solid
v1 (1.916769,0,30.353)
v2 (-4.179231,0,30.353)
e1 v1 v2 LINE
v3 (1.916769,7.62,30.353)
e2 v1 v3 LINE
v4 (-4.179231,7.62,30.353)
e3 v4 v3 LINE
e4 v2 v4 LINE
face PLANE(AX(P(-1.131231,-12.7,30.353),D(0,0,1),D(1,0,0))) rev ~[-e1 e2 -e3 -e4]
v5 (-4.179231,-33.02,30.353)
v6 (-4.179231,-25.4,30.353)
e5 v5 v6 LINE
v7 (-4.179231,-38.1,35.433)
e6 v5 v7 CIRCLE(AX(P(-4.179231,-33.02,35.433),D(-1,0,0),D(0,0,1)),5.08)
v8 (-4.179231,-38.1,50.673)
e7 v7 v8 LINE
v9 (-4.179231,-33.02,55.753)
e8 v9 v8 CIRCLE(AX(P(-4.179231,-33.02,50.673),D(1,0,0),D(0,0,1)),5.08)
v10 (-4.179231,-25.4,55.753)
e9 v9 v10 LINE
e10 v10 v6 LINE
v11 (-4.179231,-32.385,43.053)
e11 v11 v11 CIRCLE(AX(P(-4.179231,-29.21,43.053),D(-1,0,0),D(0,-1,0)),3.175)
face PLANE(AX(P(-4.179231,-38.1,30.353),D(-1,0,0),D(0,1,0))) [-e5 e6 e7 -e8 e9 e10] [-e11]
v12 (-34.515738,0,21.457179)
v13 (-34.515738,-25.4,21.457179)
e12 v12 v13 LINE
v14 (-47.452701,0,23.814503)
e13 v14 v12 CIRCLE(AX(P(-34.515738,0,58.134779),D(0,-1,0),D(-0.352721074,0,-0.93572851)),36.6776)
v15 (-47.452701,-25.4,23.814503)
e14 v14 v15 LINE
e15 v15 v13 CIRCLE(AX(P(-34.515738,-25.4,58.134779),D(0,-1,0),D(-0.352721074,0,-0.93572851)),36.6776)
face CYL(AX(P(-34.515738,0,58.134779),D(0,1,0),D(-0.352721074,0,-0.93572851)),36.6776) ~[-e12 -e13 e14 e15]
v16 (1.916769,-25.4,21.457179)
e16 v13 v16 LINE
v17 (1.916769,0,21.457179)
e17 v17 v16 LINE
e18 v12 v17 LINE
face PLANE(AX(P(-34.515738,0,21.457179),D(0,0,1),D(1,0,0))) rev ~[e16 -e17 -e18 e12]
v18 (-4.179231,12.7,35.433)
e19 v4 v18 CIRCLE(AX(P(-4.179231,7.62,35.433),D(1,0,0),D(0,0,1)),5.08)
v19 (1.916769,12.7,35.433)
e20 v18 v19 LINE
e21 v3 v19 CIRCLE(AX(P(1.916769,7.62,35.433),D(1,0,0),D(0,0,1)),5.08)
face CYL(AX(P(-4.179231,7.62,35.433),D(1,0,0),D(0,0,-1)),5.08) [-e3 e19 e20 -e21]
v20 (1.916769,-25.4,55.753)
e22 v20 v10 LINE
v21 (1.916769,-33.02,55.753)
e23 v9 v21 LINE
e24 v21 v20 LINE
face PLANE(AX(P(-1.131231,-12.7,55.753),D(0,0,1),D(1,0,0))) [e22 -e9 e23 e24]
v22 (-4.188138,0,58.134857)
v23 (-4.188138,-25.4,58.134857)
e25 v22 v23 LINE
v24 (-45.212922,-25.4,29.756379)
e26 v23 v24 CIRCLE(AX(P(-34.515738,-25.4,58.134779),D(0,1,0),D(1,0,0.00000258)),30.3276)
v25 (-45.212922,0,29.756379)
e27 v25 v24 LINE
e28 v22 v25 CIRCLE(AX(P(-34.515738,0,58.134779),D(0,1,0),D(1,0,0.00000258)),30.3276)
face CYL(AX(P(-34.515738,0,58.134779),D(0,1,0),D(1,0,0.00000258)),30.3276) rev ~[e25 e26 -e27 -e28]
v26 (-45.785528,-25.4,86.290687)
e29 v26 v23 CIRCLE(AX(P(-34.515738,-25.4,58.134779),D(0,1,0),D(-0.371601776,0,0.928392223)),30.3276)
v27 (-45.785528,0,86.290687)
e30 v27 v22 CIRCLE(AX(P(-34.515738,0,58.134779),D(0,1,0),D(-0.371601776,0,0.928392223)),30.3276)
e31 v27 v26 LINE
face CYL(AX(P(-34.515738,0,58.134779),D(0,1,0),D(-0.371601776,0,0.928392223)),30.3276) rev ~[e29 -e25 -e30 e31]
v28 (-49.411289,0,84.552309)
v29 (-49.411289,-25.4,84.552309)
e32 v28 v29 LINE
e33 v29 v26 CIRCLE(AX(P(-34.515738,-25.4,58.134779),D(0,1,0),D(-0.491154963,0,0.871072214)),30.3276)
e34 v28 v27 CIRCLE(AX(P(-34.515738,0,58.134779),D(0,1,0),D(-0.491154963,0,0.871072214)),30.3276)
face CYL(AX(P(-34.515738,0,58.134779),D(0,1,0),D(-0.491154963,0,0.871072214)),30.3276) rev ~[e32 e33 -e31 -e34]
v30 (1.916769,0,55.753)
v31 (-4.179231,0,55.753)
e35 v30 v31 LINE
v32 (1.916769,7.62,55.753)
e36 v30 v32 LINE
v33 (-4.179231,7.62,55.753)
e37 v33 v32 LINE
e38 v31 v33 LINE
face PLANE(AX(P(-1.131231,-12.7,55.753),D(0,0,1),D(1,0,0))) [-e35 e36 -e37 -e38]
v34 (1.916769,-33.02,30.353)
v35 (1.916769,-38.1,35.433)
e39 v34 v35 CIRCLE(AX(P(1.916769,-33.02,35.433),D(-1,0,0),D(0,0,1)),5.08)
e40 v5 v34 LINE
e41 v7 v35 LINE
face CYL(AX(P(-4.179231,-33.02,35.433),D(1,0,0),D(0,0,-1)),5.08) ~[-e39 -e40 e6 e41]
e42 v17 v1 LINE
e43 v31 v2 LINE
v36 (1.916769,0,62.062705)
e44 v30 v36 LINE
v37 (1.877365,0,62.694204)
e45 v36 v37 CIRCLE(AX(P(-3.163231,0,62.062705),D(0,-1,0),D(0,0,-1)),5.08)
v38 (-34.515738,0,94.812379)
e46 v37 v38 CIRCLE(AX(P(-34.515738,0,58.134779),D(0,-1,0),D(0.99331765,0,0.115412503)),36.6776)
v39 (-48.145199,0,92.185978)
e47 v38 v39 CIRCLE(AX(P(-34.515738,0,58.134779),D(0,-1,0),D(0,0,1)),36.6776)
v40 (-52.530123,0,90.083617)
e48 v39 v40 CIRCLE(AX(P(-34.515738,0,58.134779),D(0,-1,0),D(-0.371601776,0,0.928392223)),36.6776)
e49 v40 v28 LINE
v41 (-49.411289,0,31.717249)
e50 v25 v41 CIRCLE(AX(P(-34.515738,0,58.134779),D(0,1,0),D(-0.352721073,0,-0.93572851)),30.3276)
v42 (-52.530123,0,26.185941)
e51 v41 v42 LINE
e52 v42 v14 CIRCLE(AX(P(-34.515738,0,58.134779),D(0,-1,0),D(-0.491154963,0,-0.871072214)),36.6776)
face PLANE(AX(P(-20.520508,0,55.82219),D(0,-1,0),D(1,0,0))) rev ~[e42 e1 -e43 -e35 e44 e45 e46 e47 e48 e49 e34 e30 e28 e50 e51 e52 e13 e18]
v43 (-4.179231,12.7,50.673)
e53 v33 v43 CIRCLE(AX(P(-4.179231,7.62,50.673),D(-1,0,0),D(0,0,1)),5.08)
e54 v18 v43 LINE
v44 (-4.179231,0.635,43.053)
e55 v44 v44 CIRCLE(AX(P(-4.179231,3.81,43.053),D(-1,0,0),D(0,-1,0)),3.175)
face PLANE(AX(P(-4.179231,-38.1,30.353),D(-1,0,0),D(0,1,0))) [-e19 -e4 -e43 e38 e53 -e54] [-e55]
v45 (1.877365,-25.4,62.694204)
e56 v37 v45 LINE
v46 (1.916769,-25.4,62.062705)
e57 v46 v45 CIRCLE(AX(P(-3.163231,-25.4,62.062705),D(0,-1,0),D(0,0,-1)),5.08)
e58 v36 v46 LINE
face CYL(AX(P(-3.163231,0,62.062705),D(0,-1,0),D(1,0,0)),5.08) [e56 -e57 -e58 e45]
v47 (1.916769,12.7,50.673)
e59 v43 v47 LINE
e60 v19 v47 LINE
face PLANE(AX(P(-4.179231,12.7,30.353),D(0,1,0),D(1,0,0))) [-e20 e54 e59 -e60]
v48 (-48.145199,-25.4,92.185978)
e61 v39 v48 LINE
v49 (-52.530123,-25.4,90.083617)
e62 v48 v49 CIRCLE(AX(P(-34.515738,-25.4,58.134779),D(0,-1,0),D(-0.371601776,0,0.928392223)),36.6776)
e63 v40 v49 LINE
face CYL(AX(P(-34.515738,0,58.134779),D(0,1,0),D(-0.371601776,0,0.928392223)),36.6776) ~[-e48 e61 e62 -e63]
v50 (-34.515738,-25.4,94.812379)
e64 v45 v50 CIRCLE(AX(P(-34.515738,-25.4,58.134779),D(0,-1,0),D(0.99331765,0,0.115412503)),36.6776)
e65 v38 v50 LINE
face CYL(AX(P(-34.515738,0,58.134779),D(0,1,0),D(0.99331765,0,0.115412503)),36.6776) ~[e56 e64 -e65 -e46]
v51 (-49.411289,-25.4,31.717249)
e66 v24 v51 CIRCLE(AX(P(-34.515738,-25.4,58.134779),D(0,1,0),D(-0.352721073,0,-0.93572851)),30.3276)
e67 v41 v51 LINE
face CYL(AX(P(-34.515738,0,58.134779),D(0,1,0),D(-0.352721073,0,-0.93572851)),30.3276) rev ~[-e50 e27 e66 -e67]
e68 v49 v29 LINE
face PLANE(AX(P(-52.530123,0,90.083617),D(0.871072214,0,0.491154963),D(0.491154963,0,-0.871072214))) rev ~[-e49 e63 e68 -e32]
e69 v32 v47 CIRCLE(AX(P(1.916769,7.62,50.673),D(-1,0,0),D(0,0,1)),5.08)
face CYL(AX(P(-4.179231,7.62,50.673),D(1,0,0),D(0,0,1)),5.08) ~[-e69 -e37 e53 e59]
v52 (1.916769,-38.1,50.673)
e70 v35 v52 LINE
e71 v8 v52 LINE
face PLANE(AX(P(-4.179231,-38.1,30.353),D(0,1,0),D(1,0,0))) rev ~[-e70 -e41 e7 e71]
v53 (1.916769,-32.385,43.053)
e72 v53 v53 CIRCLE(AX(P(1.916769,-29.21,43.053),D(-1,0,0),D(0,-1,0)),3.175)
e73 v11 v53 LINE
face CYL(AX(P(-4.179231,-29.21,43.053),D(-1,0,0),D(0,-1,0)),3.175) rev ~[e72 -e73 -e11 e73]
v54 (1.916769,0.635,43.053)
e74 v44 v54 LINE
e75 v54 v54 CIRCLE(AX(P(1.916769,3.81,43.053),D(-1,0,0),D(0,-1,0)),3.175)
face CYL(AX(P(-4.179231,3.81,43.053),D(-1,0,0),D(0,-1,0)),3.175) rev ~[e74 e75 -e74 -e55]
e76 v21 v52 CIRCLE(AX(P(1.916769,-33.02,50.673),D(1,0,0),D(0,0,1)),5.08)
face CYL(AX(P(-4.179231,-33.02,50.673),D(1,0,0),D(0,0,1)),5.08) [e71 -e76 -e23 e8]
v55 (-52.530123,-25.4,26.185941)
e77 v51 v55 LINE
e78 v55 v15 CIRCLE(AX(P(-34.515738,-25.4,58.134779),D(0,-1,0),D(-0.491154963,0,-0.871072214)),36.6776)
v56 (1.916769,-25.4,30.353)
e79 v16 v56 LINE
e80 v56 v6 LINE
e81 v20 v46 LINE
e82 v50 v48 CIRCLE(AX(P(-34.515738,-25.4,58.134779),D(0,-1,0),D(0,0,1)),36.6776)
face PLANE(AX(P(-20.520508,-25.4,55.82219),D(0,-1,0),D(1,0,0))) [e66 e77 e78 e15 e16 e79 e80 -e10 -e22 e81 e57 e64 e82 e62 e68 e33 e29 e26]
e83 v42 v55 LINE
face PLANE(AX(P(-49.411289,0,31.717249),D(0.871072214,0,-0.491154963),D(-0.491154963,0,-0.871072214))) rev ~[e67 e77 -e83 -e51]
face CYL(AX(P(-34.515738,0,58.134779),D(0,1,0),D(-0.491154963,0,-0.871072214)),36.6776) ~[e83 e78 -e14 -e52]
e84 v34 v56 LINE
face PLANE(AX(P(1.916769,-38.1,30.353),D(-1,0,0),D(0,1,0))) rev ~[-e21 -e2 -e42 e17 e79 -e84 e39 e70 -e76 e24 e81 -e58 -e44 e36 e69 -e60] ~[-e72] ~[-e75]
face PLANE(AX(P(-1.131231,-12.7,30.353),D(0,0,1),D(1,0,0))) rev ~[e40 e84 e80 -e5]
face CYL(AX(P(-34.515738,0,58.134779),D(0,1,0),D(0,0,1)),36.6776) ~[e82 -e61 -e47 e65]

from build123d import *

# Parameters (mm, degrees)
F2_DEPTH = 25.4
F3_W     = 6.096
F3_H     = 50.8
F4_DEPTH = 25.4
F5_R     = 5.08
F6_R     = 3.175
F7_DEPTH = 6.097
F8_R     = 3.175
F9_DEPTH = 6.097


# Not quite as in the source:
# - a feature names something its author has since deleted; it is built from what else it names


with BuildPart() as f2:
    # F1 (on Front) → F2 (new body)
    with BuildSketch(Plane.XZ):
        with BuildLine():
            ThreePointArc((-4.1881381368, 58.1348573723), (-17.2625408115, 33.1930369346), (-45.2129217657, 29.7563791738))
            ThreePointArc((-45.2129217657, 29.7563791738), (-47.3496102258, 30.6565141034), (-49.4112893939, 31.7172494495))
            Line((-49.4112893939, 31.7172494495), (-52.5301234092, 26.1859408896))
            ThreePointArc((-52.5301234092, 26.1859408896), (-50.0367693734, 24.903108528), (-47.4527005825, 23.8145031357))
            ThreePointArc((-47.4527005825, 23.8145031357), (-41.0907281326, 22.0513224192), (-34.5157381367, 21.4571791316))
            Line((-34.5157381367, 21.4571791316), (1.9167693099, 21.4571791316))
            Line((1.9167693099, 21.4571791316), (1.9167693099, 62.3678327477))
            ThreePointArc((1.9167693099, 62.3678327477), (-10.1232383217, 85.5255128665), (-34.5157381367, 94.8123791316))
            ThreePointArc((-34.5157381367, 94.8123791316), (-41.4558425944, 94.1497939431), (-48.145199434, 92.1859777376))
            ThreePointArc((-48.145199434, 92.1859777376), (-50.3725422349, 91.2075489816), (-52.5301234092, 90.0836173735))
            Line((-52.5301234092, 90.0836173735), (-49.4112893939, 84.5523088136))
            ThreePointArc((-49.4112893939, 84.5523088136), (-47.6272506666, 85.4816539244), (-45.7855281567, 86.2906871202))
            ThreePointArc((-45.7855281567, 86.2906871202), (-17.5160993904, 83.2500255818), (-4.1881381368, 58.1348573723))
        make_face()
    extrude(amount=F2_DEPTH)

    # F3 (on offset) → F4 (join)
    with BuildSketch(Plane.XY.offset(30.353)):
        with Locations((-1.1312306901, -12.7)):
            Rectangle(F3_W, F3_H)
    extrude(amount=F4_DEPTH)

    # F5
    f5_edges = [f2.edges().sort_by_distance(p)[0] for p in [
        (1.916769, -12.7, 62.367833),
        (-1.131231, -38.1, 55.753),
        (-1.131231, -38.1, 30.353),
        (-1.131231, 12.7, 30.353),
        (-1.131231, 12.7, 55.753),
    ]]
    fillet(f5_edges, radius=F5_R)

    # F6 (on face) → F7 (cut, through all)
    with BuildSketch(Plane(origin=(-4.1792306901, 0, 0), x_dir=(0, -1, 0), z_dir=(-1, 0, 0))):
        with Locations((-3.81, 43.053)):
            Circle(F6_R)
    extrude(amount=-F7_DEPTH, mode=Mode.SUBTRACT)

    # F8 (on face) → F9 (cut, through all)
    with BuildSketch(Plane(origin=(-4.1792306901, 0, 0), x_dir=(0, -1, 0), z_dir=(-1, 0, 0))):
        with Locations((29.21, 43.053)):
            Circle(F8_R)
    extrude(amount=-F9_DEPTH, mode=Mode.SUBTRACT)


solid = f2.part
